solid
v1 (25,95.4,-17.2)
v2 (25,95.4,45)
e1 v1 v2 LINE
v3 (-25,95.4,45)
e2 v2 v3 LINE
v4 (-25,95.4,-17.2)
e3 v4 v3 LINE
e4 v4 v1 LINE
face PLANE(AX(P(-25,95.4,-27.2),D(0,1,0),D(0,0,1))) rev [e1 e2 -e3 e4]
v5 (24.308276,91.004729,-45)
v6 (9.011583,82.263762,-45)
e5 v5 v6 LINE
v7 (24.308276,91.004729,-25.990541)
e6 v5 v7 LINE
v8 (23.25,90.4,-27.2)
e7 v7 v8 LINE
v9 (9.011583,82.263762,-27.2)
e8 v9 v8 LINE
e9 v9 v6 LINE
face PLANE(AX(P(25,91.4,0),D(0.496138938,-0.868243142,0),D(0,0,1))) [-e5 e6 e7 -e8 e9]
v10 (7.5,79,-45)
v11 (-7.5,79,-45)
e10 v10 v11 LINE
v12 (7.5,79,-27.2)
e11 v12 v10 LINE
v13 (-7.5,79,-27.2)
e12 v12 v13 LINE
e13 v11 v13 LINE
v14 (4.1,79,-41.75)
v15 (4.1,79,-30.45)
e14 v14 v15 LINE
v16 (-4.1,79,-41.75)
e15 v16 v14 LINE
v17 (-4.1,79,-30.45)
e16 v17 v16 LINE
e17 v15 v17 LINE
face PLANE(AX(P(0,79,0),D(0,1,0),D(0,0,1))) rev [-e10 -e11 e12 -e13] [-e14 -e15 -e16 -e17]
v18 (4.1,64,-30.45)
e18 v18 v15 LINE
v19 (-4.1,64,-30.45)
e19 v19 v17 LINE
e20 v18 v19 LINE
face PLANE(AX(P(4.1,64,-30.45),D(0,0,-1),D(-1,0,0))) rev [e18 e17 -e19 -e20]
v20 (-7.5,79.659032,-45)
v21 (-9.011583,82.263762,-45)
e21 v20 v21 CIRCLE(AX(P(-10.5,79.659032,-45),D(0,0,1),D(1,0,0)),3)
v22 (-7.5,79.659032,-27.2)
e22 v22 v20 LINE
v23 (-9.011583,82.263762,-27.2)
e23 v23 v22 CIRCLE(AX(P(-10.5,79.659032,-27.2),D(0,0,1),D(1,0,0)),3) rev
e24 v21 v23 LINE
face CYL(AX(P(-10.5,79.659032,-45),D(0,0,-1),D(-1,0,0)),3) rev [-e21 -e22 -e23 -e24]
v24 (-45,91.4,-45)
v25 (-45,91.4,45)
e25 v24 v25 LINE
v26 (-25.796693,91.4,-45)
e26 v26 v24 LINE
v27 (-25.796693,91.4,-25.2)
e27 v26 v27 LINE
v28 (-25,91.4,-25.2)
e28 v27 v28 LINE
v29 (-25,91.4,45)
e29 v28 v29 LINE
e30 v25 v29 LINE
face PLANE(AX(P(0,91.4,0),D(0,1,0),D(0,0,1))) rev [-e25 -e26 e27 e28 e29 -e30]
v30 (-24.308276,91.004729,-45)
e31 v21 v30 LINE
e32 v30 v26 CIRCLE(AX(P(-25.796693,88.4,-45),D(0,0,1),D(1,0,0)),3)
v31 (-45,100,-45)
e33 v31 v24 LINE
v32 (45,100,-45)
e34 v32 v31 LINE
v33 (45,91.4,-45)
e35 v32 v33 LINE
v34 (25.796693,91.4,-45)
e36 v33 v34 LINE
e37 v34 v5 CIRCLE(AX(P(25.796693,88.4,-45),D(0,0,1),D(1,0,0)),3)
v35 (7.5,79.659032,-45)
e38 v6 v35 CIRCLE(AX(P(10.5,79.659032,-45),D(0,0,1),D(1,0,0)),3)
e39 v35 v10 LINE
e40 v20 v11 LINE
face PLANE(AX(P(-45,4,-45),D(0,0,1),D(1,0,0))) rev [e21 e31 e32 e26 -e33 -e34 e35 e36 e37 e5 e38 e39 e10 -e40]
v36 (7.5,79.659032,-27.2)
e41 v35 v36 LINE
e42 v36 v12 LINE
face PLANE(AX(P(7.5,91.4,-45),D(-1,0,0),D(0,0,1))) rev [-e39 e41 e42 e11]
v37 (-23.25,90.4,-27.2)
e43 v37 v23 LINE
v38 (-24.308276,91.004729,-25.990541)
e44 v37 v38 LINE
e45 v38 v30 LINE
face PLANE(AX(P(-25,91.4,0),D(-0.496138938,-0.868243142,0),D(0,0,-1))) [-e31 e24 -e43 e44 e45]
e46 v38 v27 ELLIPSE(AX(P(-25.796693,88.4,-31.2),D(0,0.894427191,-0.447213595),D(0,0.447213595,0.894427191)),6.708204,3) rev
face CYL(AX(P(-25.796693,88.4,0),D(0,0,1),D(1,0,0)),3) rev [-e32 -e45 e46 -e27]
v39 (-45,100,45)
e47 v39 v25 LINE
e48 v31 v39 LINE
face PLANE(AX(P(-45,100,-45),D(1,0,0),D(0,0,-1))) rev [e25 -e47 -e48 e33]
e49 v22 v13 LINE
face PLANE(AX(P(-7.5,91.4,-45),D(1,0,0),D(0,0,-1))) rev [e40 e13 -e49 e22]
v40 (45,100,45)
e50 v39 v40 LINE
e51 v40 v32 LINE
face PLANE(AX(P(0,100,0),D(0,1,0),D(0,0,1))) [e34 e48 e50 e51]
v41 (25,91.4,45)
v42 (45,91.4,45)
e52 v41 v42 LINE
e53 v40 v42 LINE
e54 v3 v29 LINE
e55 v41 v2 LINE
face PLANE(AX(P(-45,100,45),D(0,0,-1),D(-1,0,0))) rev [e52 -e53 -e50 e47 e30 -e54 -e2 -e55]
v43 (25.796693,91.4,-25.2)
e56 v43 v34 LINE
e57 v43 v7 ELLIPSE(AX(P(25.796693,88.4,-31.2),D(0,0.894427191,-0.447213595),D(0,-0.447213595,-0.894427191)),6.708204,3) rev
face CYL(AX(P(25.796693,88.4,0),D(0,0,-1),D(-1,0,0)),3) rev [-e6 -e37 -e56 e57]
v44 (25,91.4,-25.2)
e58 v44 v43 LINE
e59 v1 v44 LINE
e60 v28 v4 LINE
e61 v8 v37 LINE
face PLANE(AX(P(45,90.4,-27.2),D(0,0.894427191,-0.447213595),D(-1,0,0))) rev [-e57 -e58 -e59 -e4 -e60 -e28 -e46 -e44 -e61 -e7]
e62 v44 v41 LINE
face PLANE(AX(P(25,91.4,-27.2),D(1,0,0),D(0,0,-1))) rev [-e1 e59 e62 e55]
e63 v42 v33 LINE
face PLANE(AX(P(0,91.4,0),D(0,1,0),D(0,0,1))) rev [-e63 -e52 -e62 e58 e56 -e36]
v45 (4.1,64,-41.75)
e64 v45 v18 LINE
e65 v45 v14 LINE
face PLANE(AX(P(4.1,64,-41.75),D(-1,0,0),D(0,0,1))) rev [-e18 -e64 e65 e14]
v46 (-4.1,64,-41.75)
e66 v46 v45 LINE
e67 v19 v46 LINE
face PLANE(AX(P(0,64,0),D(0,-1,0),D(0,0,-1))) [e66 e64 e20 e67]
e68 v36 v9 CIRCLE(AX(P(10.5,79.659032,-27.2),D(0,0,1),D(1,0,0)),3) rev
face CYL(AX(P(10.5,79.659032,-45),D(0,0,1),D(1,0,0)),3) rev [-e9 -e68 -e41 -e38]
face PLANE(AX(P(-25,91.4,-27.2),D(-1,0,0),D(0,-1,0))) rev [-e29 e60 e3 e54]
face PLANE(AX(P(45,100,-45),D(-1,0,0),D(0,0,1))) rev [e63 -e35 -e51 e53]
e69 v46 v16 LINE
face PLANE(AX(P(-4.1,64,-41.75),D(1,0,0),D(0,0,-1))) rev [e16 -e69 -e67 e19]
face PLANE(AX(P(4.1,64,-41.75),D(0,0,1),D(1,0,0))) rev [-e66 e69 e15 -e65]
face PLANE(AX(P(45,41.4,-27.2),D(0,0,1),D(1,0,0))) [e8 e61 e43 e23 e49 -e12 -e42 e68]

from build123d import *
from OCP.BRepFilletAPI import BRepFilletAPI_MakeChamfer

# Parameters (mm, degrees)
ESQUISSE2_W             = 90
ESQUISSE2_H             = 90
BOSS_EXTRU_1_DEPTH      = 4
ESQUISSE3_W             = 9.2
ESQUISSE3_H             = 10.3
BOSS_EXTRU_2_DEPTH      = 2.4
CONG_1_R                = 1
ESQUISSE5_W             = 14.85
ESQUISSE5_H             = 90
BOSS_EXTRU_3_DEPTH      = 2.4
ESQUISSE6_W             = 7
ESQUISSE6_H             = 5
BOSS_EXTRU_4_DEPTH      = 38
ESQUISSE8_W             = 14.85
ESQUISSE8_H             = 18
BOSS_EXTRU_5_DEPTH      = 38
BOSS_EXTRU_6_REACH      = 97.814
ESQUISSE9_W             = 7
ESQUISSE9_H             = 2
CONG_1_OF_SYM_TRIE1_R   = 1
ENL_V_MAT_EXTRU_1_REACH = 111.983
ESQUISSE10_W            = 2
ESQUISSE10_H            = 18
ENL_V_MAT_EXTRU_2_REACH = 77.38
ESQUISSE11_W            = 40
ESQUISSE11_H            = 18
BOSS_EXTRU_7_REACH      = 100.203
ESQUISSE12_W            = 5
ESQUISSE12_H            = 8.6
ESQUISSE13_W            = 6.9
ESQUISSE13_H            = 7.6
BOSS_EXTRU_8_DEPTH      = 2.45
CONG_2_R                = 1
CONG_2_OF_SYM_TRIE2_R   = 1
BOSS_EXTRU_9_DEPTH      = 3
BOSS_EXTRU_9_DEPTH_BACK = 3
ESQUISSE14_W            = 90
ESQUISSE14_H            = 17.8
ESQUISSE15_W            = 15
ESQUISSE15_H            = 17.8
BOSS_EXTRU_10_DEPTH     = 44
ESQUISSE16_W            = 90
ESQUISSE16_H            = 90
BOSS_EXTRU_11_DEPTH     = 8.6
ESQUISSE20_W            = 12
ESQUISSE20_H            = 6.4
BOSS_EXTRU_13_DEPTH     = 10
ESQUISSE21_W            = 12
ESQUISSE21_H            = 6.4
BOSS_EXTRU_14_DEPTH     = 10
CONG_3_R                = 6
ENL_V_MAT_EXTRU_4_REACH = 123.7
ESQUISSE23_R            = 2.3
CONG_3_OF_SYM_TRIE3_R   = 6
ENL_V_MAT_EXTRU_5_REACH = 123.7
ESQUISSE24_R            = 1.75
ENL_V_MAT_EXTRU_6_REACH = 135.65
ESQUISSE26_R            = 1.75
ESQUISSE27_W            = 50
ESQUISSE27_H            = 4
ENL_V_MAT_EXTRU_7_DEPTH = 72.2
CHANFREIN3_SIZE         = 28.5
CHANFREIN3_SIZE2        = 9.5
CHANFREIN4_SIZE         = 10
CHANFREIN4_SIZE2        = 17.5
CHANFREIN8_START        = -45
CHANFREIN8_DEPTH        = 17.8
CHANFREIN9_SIZE         = 3
CHANFREIN9_SIZE_2       = 9
CHANFREIN10_START       = 25.930676813
CHANFREIN10_OUTLINE_W   = 40
CHANFREIN10_OUTLINE_H   = 3.16227766
CHANFREIN10_DEPTH       = 2.069323187
CONG_9_R                = 3
ESQUISSE37_R            = 4
ENL_V_MAT_EXTRU_8_DEPTH = 3
BOSS_EXTRU_15_DEPTH     = 4.8
CONG_11_R               = 3
CHANFREIN14_SIZE        = 10
CHANFREIN14_SIZE2       = 5
ESQUISSE39_W            = 110.537037217
ESQUISSE39_H            = 103.424550411
ENL_V_MAT_EXTRU_9_DEPTH = 79
ESQUISSE40_W            = 8.2
ESQUISSE40_H            = 11.3
BOSS_EXTRU_16_DEPTH     = 15


with BuildPart() as part:
    # Esquisse2 → Boss.-Extru.1 (new body)
    with BuildSketch(Plane(origin=(0, 0, 0), x_dir=(1, 0, 0), z_dir=(0, 1, 0))):
        Rectangle(ESQUISSE2_W, ESQUISSE2_H)
    extrude(amount=BOSS_EXTRU_1_DEPTH)

    # Esquisse3 → Boss.-Extru.2 (add)
    with BuildSketch(Plane(origin=(0, 4, 0), x_dir=(1, 0, 0), z_dir=(0, 1, 0))):
        with Locations((25.55, -6)):
            Rectangle(ESQUISSE3_W, ESQUISSE3_H)
    boss_extru_2 = extrude(amount=BOSS_EXTRU_2_DEPTH)

    # Congé1
    cong_1_edges = [part.edges().sort_by_distance(p)[0] for p in [
        (20.95, 5.2, 0.85),
        (20.95, 5.2, 11.15),
    ]]
    fillet(cong_1_edges, radius=CONG_1_R)

    # Esquisse5 → Boss.-Extru.3 (add)
    with BuildSketch(Plane(origin=(0, 4, 0), x_dir=(1, 0, 0), z_dir=(0, 1, 0))):
        with Locations((37.575, 0)):
            Rectangle(ESQUISSE5_W, ESQUISSE5_H)
    boss_extru_3 = extrude(amount=BOSS_EXTRU_3_DEPTH)

    # Esquisse6 → Boss.-Extru.4 (add)
    with BuildSketch(Plane(origin=(0, 6.4, 0), x_dir=(1, 0, 0), z_dir=(0, 1, 0))):
        with Locations((33.65, -42.5)):
            Rectangle(ESQUISSE6_W, ESQUISSE6_H)
    boss_extru_4 = extrude(amount=BOSS_EXTRU_4_DEPTH)

    # Esquisse8 → Boss.-Extru.5 (add)
    with BuildSketch(Plane(origin=(0, 6.4, 0), x_dir=(1, 0, 0), z_dir=(0, 1, 0))):
        with Locations((37.575, 36)):
            Rectangle(ESQUISSE8_W, ESQUISSE8_H)
    boss_extru_5 = extrude(amount=BOSS_EXTRU_5_DEPTH)

    # Esquisse9 → Boss.-Extru.6 (add, up to next)
    with BuildSketch(Plane.XY.offset(-27), mode=Mode.PRIVATE) as boss_extru_6_sk1:
        with Locations((33.65, 43.4)):
            Rectangle(ESQUISSE9_W, ESQUISSE9_H)
    boss_extru_6_tool1 = extrude(boss_extru_6_sk1.sketch, amount=BOSS_EXTRU_6_REACH, mode=Mode.PRIVATE) - part.part
    boss_extru_6 = boss_extru_6_tool1.solids().sort_by_distance((33.65, 43.4, -27))[0]
    add(boss_extru_6)

    # Symétrie1: Boss.-Extru.2, Boss.-Extru.3, Boss.-Extru.4, Boss.-Extru.5, Boss.-Extru.6 across plane
    add(boss_extru_2.mirror(Plane(origin=(0, 0, 0), x_dir=(0, 0, 1), z_dir=(1, 0, 0))))
    add(boss_extru_3.mirror(Plane(origin=(0, 0, 0), x_dir=(0, 0, 1), z_dir=(1, 0, 0))))
    add(boss_extru_4.mirror(Plane(origin=(0, 0, 0), x_dir=(0, 0, 1), z_dir=(1, 0, 0))))
    add(boss_extru_5.mirror(Plane(origin=(0, 0, 0), x_dir=(0, 0, 1), z_dir=(1, 0, 0))))
    add(boss_extru_6.mirror(Plane(origin=(0, 0, 0), x_dir=(0, 0, 1), z_dir=(1, 0, 0))))

    # Congé1 of Symétrie1
    cong_1_of_sym_trie1_edges = [part.edges().sort_by_distance(p)[0] for p in [
        (-20.95, 5.2, 0.85),
        (-20.95, 5.2, 11.15),
    ]]
    fillet(cong_1_of_sym_trie1_edges, radius=CONG_1_OF_SYM_TRIE1_R)

    # Esquisse10 → Enlèv. mat.-Extru.1 (cut, up to next)
    with BuildSketch(Plane.XY.offset(45), mode=Mode.PRIVATE) as enl_v_mat_extru_1_sk1:
        with Locations((-31.15, 26.85)):
            Rectangle(ESQUISSE10_W, ESQUISSE10_H)
    enl_v_mat_extru_1_tool1 = extrude(enl_v_mat_extru_1_sk1.sketch, amount=-ENL_V_MAT_EXTRU_1_REACH, mode=Mode.PRIVATE) & part.part
    add(enl_v_mat_extru_1_tool1.solids().sort_by_distance((-31.15, 26.85, 45))[0], mode=Mode.SUBTRACT)

    # Esquisse11 → Enlèv. mat.-Extru.2 (cut, up to next)
    with BuildSketch(Plane(origin=(0, 4, 0), x_dir=(1, 0, 0), z_dir=(0, 1, 0)), mode=Mode.PRIVATE) as enl_v_mat_extru_2_sk1:
        with Locations((0, 36)):
            Rectangle(ESQUISSE11_W, ESQUISSE11_H)
    enl_v_mat_extru_2_tool1 = extrude(enl_v_mat_extru_2_sk1.sketch, amount=-ENL_V_MAT_EXTRU_2_REACH, mode=Mode.PRIVATE) & part.part
    add(enl_v_mat_extru_2_tool1.solids().sort_by_distance((0, 4, -36))[0], mode=Mode.SUBTRACT)

    # Esquisse12 → Boss.-Extru.7 (add, up to next)
    with BuildSketch(Plane(origin=(-30.15, 0, 0), x_dir=(0, 0, -1), z_dir=(1, 0, 0)), mode=Mode.PRIVATE) as boss_extru_7_sk1:
        with Locations((29.5, 29.34)):
            Rectangle(ESQUISSE12_W, ESQUISSE12_H)
    boss_extru_7_tool1 = extrude(boss_extru_7_sk1.sketch, amount=BOSS_EXTRU_7_REACH, mode=Mode.PRIVATE) - part.part
    add(boss_extru_7_tool1.solids().sort_by_distance((-30.15, 29.34, -29.5))[0])

    # Esquisse13 → Boss.-Extru.8 (add)
    with BuildSketch(Plane.XY.offset(-27)):
        with Locations((24.4, 29.84)):
            Rectangle(ESQUISSE13_W, ESQUISSE13_H)
    boss_extru_8 = extrude(amount=BOSS_EXTRU_8_DEPTH)

    # Congé2
    cong_2_edges = [part.edges().sort_by_distance(p)[0] for p in [
        (20.95, 33.64, -25.775),
        (20.95, 26.04, -25.775),
    ]]
    fillet(cong_2_edges, radius=CONG_2_R)

    # Symétrie2: Boss.-Extru.8 across plane
    add(boss_extru_8.mirror(Plane(origin=(0, 0, 0), x_dir=(0, 0, 1), z_dir=(1, 0, 0))))

    # Congé2 of Symétrie2
    cong_2_of_sym_trie2_edges = [part.edges().sort_by_distance(p)[0] for p in [
        (-20.95, 33.64, -25.775),
        (-20.95, 26.04, -25.775),
    ]]
    fillet(cong_2_of_sym_trie2_edges, radius=CONG_2_OF_SYM_TRIE2_R)

    # Esquisse14 → Boss.-Extru.9 (add, two sides: drawn at the far end of the back side and taken through both)
    with BuildSketch(Plane(origin=(0, 44.4, 0), x_dir=(1, 0, 0), z_dir=(0, 1, 0)).offset(-BOSS_EXTRU_9_DEPTH_BACK)):
        with Locations((0, 36.1)):
            Rectangle(ESQUISSE14_W, ESQUISSE14_H)
    extrude(amount=BOSS_EXTRU_9_DEPTH + BOSS_EXTRU_9_DEPTH_BACK)

    # Esquisse15 → Boss.-Extru.10 (add)
    with BuildSketch(Plane(origin=(0, 47.4, 0), x_dir=(1, 0, 0), z_dir=(0, 1, 0))):
        with Locations((0, 36.1)):
            Rectangle(ESQUISSE15_W, ESQUISSE15_H)
    extrude(amount=BOSS_EXTRU_10_DEPTH)

    # Esquisse16 → Boss.-Extru.11 (add)
    with BuildSketch(Plane(origin=(0, 91.4, 0), x_dir=(1, 0, 0), z_dir=(0, 1, 0))):
        Rectangle(ESQUISSE16_W, ESQUISSE16_H)
    extrude(amount=BOSS_EXTRU_11_DEPTH)

    # Esquisse20 → Boss.-Extru.13 (add)
    with BuildSketch(Plane(origin=(45, 0, 0), x_dir=(0, 0, -1), z_dir=(1, 0, 0))):
        with Locations((-11, 3.2)):
            Rectangle(ESQUISSE20_W, ESQUISSE20_H)
    boss_extru_13 = extrude(amount=BOSS_EXTRU_13_DEPTH)

    # Esquisse21 → Boss.-Extru.14 (add)
    with BuildSketch(Plane(origin=(0, 0, -45), x_dir=(-1, 0, 0), z_dir=(0, 0, -1))):
        with Locations((-39, 3.2)):
            Rectangle(ESQUISSE21_W, ESQUISSE21_H)
    boss_extru_14 = extrude(amount=BOSS_EXTRU_14_DEPTH)

    # Congé3
    cong_3_edges = [part.edges().sort_by_distance(p)[0] for p in [
        (33, 3.2, -55),
        (45, 3.2, -55),
        (55, 3.2, 5),
        (55, 3.2, 17),
    ]]
    fillet(cong_3_edges, radius=CONG_3_R - 0.0001)  # a hair under: the kernel refuses the full size

    # Esquisse23 → Enlèv. mat.-Extru.4 (cut, up to next)
    with BuildSketch(Plane(origin=(0, 6.4, 0), x_dir=(1, 0, 0), z_dir=(0, 1, 0)), mode=Mode.PRIVATE) as enl_v_mat_extru_4_sk1:
        with Locations(Location((50, -11, 0), (0, 0, 270))):
            Circle(ESQUISSE23_R)
    enl_v_mat_extru_4_tool1 = extrude(enl_v_mat_extru_4_sk1.sketch, amount=-ENL_V_MAT_EXTRU_4_REACH, mode=Mode.PRIVATE) & part.part
    # Esquisse23 → Enlèv. mat.-Extru.4 (cut, up to next)
    with BuildSketch(Plane(origin=(0, 6.4, 0), x_dir=(1, 0, 0), z_dir=(0, 1, 0)), mode=Mode.PRIVATE) as enl_v_mat_extru_4_sk2:
        with Locations(Location((39, 50, 0), (0, 0, 270))):
            Circle(ESQUISSE23_R)
    enl_v_mat_extru_4_tool2 = extrude(enl_v_mat_extru_4_sk2.sketch, amount=-ENL_V_MAT_EXTRU_4_REACH, mode=Mode.PRIVATE) & part.part
    enl_v_mat_extru_4_1 = enl_v_mat_extru_4_tool1.solids().sort_by_distance((50, 6.4, 11))[0]
    add(enl_v_mat_extru_4_1, mode=Mode.SUBTRACT)
    enl_v_mat_extru_4_2 = enl_v_mat_extru_4_tool2.solids().sort_by_distance((39, 6.4, -50))[0]
    add(enl_v_mat_extru_4_2, mode=Mode.SUBTRACT)
    enl_v_mat_extru_4 = enl_v_mat_extru_4_1 + enl_v_mat_extru_4_2  # Enlèv. mat.-Extru.4 as one shape, for the pattern or mirror that repeats it

    # Symétrie3: Boss.-Extru.13, Boss.-Extru.14, Enlèv. mat.-Extru.4 across plane
    add(boss_extru_13.mirror(Plane(origin=(0, 0, 0), x_dir=(0, 0, 1), z_dir=(1, 0, 0))))
    add(boss_extru_14.mirror(Plane(origin=(0, 0, 0), x_dir=(0, 0, 1), z_dir=(1, 0, 0))))
    add(enl_v_mat_extru_4.mirror(Plane(origin=(0, 0, 0), x_dir=(0, 0, 1), z_dir=(1, 0, 0))), mode=Mode.SUBTRACT)

    # Congé3 of Symétrie3
    cong_3_of_sym_trie3_edges = [part.edges().sort_by_distance(p)[0] for p in [
        (-33, 3.2, -55),
        (-45, 3.2, -55),
        (-55, 3.2, 5),
        (-55, 3.2, 17),
    ]]
    fillet(cong_3_of_sym_trie3_edges, radius=CONG_3_OF_SYM_TRIE3_R - 0.0001)  # a hair under: the kernel refuses the full size

    # Esquisse24 → Enlèv. mat.-Extru.5 (cut, up to next)
    with BuildSketch(Plane(origin=(0, 6.4, 0), x_dir=(1, 0, 0), z_dir=(0, 1, 0)), mode=Mode.PRIVATE) as enl_v_mat_extru_5_sk1:
        with Locations(Location((25.45, -6, 0), (0, 0, 270))):
            Circle(ESQUISSE24_R)
    enl_v_mat_extru_5_tool1 = extrude(enl_v_mat_extru_5_sk1.sketch, amount=-ENL_V_MAT_EXTRU_5_REACH, mode=Mode.PRIVATE) & part.part
    enl_v_mat_extru_5 = enl_v_mat_extru_5_tool1.solids().sort_by_distance((25.45, 6.4, 6))[0]
    add(enl_v_mat_extru_5, mode=Mode.SUBTRACT)

    # Esquisse26 → Enlèv. mat.-Extru.6 (cut, up to next)
    with BuildSketch(Plane.XY.offset(-24.55), mode=Mode.PRIVATE) as enl_v_mat_extru_6_sk1:
        with Locations((25.55, 28.44)):
            Circle(ESQUISSE26_R)
    enl_v_mat_extru_6_tool1 = extrude(enl_v_mat_extru_6_sk1.sketch, amount=-ENL_V_MAT_EXTRU_6_REACH, mode=Mode.PRIVATE) & part.part
    enl_v_mat_extru_6 = enl_v_mat_extru_6_tool1.solids().sort_by_distance((25.55, 28.44, -24.55))[0]
    add(enl_v_mat_extru_6, mode=Mode.SUBTRACT)

    # Symétrie5: Enlèv. mat.-Extru.5, Enlèv. mat.-Extru.6 across plane
    add(enl_v_mat_extru_5.mirror(Plane(origin=(0, 0, 0), x_dir=(0, 0, 1), z_dir=(1, 0, 0))), mode=Mode.SUBTRACT)
    add(enl_v_mat_extru_6.mirror(Plane(origin=(0, 0, 0), x_dir=(0, 0, 1), z_dir=(1, 0, 0))), mode=Mode.SUBTRACT)

    # Esquisse27 → Enlèv. mat.-Extru.7 (cut)
    with BuildSketch(Plane.XY.offset(45)):
        with Locations((0, 93.4)):
            Rectangle(ESQUISSE27_W, ESQUISSE27_H)
    extrude(amount=-ENL_V_MAT_EXTRU_7_DEPTH, mode=Mode.SUBTRACT)

    # Chanfrein3: one chamfer whose edges measure the first distance from different faces: ONE call of the kernel's chamfer builder (chamfer() names one face for all edges)
    chanfrein3_edges_1 = [part.edges().sort_by_distance(p)[0] for p in [
        (-7.5, 47.4, -36.1),
    ]]
    chanfrein3_side_1 = [part.faces().sort_by_distance(p)[0] for p in [
        (-26.25, 47.4, -36.1),
    ]]
    chanfrein3_edges_2 = [part.edges().sort_by_distance(p)[0] for p in [
        (7.5, 47.4, -36.1),
    ]]
    chanfrein3_side_2 = [part.faces().sort_by_distance(p)[0] for p in [
        (26.25, 47.4, -36.1),
    ]]
    chanfrein3 = BRepFilletAPI_MakeChamfer(part.part.solid().wrapped)
    for e in chanfrein3_edges_1:
        chanfrein3.Add(CHANFREIN3_SIZE, CHANFREIN3_SIZE2, e.wrapped, chanfrein3_side_1[0].wrapped)  # the first distance lies on this face
    for e in chanfrein3_edges_2:
        chanfrein3.Add(CHANFREIN3_SIZE, CHANFREIN3_SIZE2, e.wrapped, chanfrein3_side_2[0].wrapped)  # the first distance lies on this face
    add(Compound.cast(chanfrein3.Shape()), mode=Mode.REPLACE)

    # Chanfrein4: one chamfer whose edges measure the first distance from different faces: ONE call of the kernel's chamfer builder (chamfer() names one face for all edges)
    chanfrein4_edges_1 = [part.edges().sort_by_distance(p)[0] for p in [
        (7.5, 91.4, -36.1),
    ]]
    chanfrein4_side_1 = [part.faces().sort_by_distance(p)[0] for p in [
        (7.5, 74.15, -36.1),
    ]]
    chanfrein4_edges_2 = [part.edges().sort_by_distance(p)[0] for p in [
        (-7.5, 91.4, -36.1),
    ]]
    chanfrein4_side_2 = [part.faces().sort_by_distance(p)[0] for p in [
        (-7.5, 74.15, -36.1),
    ]]
    chanfrein4 = BRepFilletAPI_MakeChamfer(part.part.solid().wrapped)
    for e in chanfrein4_edges_1:
        chanfrein4.Add(CHANFREIN4_SIZE, CHANFREIN4_SIZE2, e.wrapped, chanfrein4_side_1[0].wrapped)  # the first distance lies on this face
    for e in chanfrein4_edges_2:
        chanfrein4.Add(CHANFREIN4_SIZE, CHANFREIN4_SIZE2, e.wrapped, chanfrein4_side_2[0].wrapped)  # the first distance lies on this face
    add(Compound.cast(chanfrein4.Shape()), mode=Mode.REPLACE)

    # Chanfrein8: read off the stored shape, not the designer's step
    # Chanfrein8 outline → Chanfrein8 (add)
    with BuildSketch(Plane.XY.offset(CHANFREIN8_START)):
        Polygon((30.15, 31.35), (30.15, 41.4), (0, 41.4), align=None)
    extrude(amount=CHANFREIN8_DEPTH)

    # Chanfrein9
    chanfrein9_edges_1 = [part.edges().sort_by_distance(p)[0] for p in [
        (45, 47.4, -36.1),
    ]]
    chanfrein9_side_1 = [part.faces().sort_by_distance(p)[0] for p in [
        (45, 47.34, -36.1),
    ]]
    chanfrein9_edges_2 = [part.edges().sort_by_distance(p)[0] for p in [
        (-45, 47.4, -36.1),
    ]]
    chanfrein9_side_2 = [part.faces().sort_by_distance(p)[0] for p in [
        (-44.94, 47.4, -36.1),
    ]]
    chanfrein9 = BRepFilletAPI_MakeChamfer(part.part.solid().wrapped)
    for e in chanfrein9_edges_1:
        chanfrein9.Add(CHANFREIN9_SIZE - 0.0001, CHANFREIN9_SIZE_2 - 0.0001, e.wrapped, chanfrein9_side_1[0].wrapped)
    for e in chanfrein9_edges_2:
        chanfrein9.Add(CHANFREIN9_SIZE_2 - 0.0001, CHANFREIN9_SIZE - 0.0001, e.wrapped, chanfrein9_side_2[0].wrapped)
    add(Compound.cast(chanfrein9.Shape()), mode=Mode.REPLACE)  # a hair under: the kernel refuses the full size

    # Chanfrein10: read off the stored shape, not the designer's step
    # Chanfrein10 outline → Chanfrein10 (cut)
    with BuildSketch(Plane(origin=(0, 0, 0), x_dir=(1, 0, 0), z_dir=(0, 0.316227766016835, -0.9486832980505149)).offset(CHANFREIN10_START)):
        with Locations((0, 6.008327554)):
            Rectangle(CHANFREIN10_OUTLINE_W, CHANFREIN10_OUTLINE_H)
    extrude(amount=CHANFREIN10_DEPTH, mode=Mode.SUBTRACT)

    # Congé9
    cong_9_edges = [part.edges().sort_by_distance(p)[0] for p in [
        (-33.65, 44.4, 45),
        (-33.65, 6.4, 40),
        (-37.575, 6.4, -27),
        (-33.65, 42.4, 40),
        (-33.65, 42.4, -27),
        (33.65, 6.4, 40),
        (33.65, 44.4, 45),
        (37.575, 6.4, -27),
        (33.65, 42.4, 40),
        (33.65, 42.4, -27),
    ]]
    fillet(cong_9_edges, radius=CONG_9_R)

    # Chanfrein13
    # the kernel refuses this chamfer: 31.5, 10.5 mm, written as the material it adds along each edge
    with BuildSketch(Plane(origin=(-30.15, 41.4, -27.2), x_dir=(0, -1, 0), z_dir=(0, 0, -1))) as chanfrein13_piece_1:
        with BuildLine():
            Line((10.898446985, 1.195340956), (-0.398446985, -32.695340956))
            Line((-0.398446985, -32.695340956), (-1.028446985, -32.695340956))
            ThreePointArc((-1.028446985, -32.695340956), (-0.63, -16.347670478), (-0.63, 0))
            Line((-0.63, 0), (0, 0.63))
            ThreePointArc((0, 0.63), (5.449223493, 0.63), (10.898446985, 1.825340956))
            Line((10.898446985, 1.825340956), (10.898446985, 1.195340956))
        make_face()
    extrude(amount=17.8)

    # Esquisse37 → Enlèv. mat.-Extru.8 (cut)
    with BuildSketch(Plane.XZ):
        with Locations(Location((-25.45, 6, 0), (0, 0, 270))):
            Circle(ESQUISSE37_R)
        with Locations(Location((25.45, 6, 0), (0, 0, 270))):
            Circle(ESQUISSE37_R)
    extrude(amount=-ENL_V_MAT_EXTRU_8_DEPTH, mode=Mode.SUBTRACT)

    # Esquisse38 → Boss.-Extru.15 (add)
    with BuildSketch(Plane.XY.offset(-27.2)):
        Polygon((0.675, 41.175), (-21.95, 33.64), (23.28, 33.64), align=None)
    extrude(amount=-BOSS_EXTRU_15_DEPTH)

    # Congé11
    cong_11_edges = [part.edges().sort_by_distance(p)[0] for p in [
        (7.5, 56.9, -36.1),
        (-7.5, 56.9, -36.1),
        (-25, 91.4, -36.1),
        (-7.5, 81.4, -36.1),
        (25, 91.4, -36.1),
        (7.5, 81.4, -36.1),
        (30.15, 31.35, -38.5),
        (-30.15, 30.9, -38.5),
        (0.675, 41.175, -38.5),
    ]]
    fillet(cong_11_edges, radius=CONG_11_R)

    # Chanfrein14
    chanfrein14_edges = [part.edges().sort_by_distance(p)[0] for p in [
        (0, 95.4, -27.2),
    ]]
    chanfrein14_side = [part.faces().sort_by_distance(p)[0] for p in [
        (0, 95.4, 8.9),
    ]]
    chamfer(chanfrein14_edges, length=CHANFREIN14_SIZE, length2=CHANFREIN14_SIZE2, reference=chanfrein14_side[0])

    # Esquisse39 → Enlèv. mat.-Extru.9 (cut)
    with BuildSketch(Plane.XZ):
        with Locations((-0.268518609, -4.614943927)):
            Rectangle(ESQUISSE39_W, ESQUISSE39_H)
    extrude(amount=-ENL_V_MAT_EXTRU_9_DEPTH, mode=Mode.SUBTRACT)

    # Esquisse40 → Boss.-Extru.16 (add)
    with BuildSketch(Plane.XZ.offset(-79)):
        with Locations((0, -36.1)):
            Rectangle(ESQUISSE40_W, ESQUISSE40_H)
    extrude(amount=BOSS_EXTRU_16_DEPTH)


solid = part.part
